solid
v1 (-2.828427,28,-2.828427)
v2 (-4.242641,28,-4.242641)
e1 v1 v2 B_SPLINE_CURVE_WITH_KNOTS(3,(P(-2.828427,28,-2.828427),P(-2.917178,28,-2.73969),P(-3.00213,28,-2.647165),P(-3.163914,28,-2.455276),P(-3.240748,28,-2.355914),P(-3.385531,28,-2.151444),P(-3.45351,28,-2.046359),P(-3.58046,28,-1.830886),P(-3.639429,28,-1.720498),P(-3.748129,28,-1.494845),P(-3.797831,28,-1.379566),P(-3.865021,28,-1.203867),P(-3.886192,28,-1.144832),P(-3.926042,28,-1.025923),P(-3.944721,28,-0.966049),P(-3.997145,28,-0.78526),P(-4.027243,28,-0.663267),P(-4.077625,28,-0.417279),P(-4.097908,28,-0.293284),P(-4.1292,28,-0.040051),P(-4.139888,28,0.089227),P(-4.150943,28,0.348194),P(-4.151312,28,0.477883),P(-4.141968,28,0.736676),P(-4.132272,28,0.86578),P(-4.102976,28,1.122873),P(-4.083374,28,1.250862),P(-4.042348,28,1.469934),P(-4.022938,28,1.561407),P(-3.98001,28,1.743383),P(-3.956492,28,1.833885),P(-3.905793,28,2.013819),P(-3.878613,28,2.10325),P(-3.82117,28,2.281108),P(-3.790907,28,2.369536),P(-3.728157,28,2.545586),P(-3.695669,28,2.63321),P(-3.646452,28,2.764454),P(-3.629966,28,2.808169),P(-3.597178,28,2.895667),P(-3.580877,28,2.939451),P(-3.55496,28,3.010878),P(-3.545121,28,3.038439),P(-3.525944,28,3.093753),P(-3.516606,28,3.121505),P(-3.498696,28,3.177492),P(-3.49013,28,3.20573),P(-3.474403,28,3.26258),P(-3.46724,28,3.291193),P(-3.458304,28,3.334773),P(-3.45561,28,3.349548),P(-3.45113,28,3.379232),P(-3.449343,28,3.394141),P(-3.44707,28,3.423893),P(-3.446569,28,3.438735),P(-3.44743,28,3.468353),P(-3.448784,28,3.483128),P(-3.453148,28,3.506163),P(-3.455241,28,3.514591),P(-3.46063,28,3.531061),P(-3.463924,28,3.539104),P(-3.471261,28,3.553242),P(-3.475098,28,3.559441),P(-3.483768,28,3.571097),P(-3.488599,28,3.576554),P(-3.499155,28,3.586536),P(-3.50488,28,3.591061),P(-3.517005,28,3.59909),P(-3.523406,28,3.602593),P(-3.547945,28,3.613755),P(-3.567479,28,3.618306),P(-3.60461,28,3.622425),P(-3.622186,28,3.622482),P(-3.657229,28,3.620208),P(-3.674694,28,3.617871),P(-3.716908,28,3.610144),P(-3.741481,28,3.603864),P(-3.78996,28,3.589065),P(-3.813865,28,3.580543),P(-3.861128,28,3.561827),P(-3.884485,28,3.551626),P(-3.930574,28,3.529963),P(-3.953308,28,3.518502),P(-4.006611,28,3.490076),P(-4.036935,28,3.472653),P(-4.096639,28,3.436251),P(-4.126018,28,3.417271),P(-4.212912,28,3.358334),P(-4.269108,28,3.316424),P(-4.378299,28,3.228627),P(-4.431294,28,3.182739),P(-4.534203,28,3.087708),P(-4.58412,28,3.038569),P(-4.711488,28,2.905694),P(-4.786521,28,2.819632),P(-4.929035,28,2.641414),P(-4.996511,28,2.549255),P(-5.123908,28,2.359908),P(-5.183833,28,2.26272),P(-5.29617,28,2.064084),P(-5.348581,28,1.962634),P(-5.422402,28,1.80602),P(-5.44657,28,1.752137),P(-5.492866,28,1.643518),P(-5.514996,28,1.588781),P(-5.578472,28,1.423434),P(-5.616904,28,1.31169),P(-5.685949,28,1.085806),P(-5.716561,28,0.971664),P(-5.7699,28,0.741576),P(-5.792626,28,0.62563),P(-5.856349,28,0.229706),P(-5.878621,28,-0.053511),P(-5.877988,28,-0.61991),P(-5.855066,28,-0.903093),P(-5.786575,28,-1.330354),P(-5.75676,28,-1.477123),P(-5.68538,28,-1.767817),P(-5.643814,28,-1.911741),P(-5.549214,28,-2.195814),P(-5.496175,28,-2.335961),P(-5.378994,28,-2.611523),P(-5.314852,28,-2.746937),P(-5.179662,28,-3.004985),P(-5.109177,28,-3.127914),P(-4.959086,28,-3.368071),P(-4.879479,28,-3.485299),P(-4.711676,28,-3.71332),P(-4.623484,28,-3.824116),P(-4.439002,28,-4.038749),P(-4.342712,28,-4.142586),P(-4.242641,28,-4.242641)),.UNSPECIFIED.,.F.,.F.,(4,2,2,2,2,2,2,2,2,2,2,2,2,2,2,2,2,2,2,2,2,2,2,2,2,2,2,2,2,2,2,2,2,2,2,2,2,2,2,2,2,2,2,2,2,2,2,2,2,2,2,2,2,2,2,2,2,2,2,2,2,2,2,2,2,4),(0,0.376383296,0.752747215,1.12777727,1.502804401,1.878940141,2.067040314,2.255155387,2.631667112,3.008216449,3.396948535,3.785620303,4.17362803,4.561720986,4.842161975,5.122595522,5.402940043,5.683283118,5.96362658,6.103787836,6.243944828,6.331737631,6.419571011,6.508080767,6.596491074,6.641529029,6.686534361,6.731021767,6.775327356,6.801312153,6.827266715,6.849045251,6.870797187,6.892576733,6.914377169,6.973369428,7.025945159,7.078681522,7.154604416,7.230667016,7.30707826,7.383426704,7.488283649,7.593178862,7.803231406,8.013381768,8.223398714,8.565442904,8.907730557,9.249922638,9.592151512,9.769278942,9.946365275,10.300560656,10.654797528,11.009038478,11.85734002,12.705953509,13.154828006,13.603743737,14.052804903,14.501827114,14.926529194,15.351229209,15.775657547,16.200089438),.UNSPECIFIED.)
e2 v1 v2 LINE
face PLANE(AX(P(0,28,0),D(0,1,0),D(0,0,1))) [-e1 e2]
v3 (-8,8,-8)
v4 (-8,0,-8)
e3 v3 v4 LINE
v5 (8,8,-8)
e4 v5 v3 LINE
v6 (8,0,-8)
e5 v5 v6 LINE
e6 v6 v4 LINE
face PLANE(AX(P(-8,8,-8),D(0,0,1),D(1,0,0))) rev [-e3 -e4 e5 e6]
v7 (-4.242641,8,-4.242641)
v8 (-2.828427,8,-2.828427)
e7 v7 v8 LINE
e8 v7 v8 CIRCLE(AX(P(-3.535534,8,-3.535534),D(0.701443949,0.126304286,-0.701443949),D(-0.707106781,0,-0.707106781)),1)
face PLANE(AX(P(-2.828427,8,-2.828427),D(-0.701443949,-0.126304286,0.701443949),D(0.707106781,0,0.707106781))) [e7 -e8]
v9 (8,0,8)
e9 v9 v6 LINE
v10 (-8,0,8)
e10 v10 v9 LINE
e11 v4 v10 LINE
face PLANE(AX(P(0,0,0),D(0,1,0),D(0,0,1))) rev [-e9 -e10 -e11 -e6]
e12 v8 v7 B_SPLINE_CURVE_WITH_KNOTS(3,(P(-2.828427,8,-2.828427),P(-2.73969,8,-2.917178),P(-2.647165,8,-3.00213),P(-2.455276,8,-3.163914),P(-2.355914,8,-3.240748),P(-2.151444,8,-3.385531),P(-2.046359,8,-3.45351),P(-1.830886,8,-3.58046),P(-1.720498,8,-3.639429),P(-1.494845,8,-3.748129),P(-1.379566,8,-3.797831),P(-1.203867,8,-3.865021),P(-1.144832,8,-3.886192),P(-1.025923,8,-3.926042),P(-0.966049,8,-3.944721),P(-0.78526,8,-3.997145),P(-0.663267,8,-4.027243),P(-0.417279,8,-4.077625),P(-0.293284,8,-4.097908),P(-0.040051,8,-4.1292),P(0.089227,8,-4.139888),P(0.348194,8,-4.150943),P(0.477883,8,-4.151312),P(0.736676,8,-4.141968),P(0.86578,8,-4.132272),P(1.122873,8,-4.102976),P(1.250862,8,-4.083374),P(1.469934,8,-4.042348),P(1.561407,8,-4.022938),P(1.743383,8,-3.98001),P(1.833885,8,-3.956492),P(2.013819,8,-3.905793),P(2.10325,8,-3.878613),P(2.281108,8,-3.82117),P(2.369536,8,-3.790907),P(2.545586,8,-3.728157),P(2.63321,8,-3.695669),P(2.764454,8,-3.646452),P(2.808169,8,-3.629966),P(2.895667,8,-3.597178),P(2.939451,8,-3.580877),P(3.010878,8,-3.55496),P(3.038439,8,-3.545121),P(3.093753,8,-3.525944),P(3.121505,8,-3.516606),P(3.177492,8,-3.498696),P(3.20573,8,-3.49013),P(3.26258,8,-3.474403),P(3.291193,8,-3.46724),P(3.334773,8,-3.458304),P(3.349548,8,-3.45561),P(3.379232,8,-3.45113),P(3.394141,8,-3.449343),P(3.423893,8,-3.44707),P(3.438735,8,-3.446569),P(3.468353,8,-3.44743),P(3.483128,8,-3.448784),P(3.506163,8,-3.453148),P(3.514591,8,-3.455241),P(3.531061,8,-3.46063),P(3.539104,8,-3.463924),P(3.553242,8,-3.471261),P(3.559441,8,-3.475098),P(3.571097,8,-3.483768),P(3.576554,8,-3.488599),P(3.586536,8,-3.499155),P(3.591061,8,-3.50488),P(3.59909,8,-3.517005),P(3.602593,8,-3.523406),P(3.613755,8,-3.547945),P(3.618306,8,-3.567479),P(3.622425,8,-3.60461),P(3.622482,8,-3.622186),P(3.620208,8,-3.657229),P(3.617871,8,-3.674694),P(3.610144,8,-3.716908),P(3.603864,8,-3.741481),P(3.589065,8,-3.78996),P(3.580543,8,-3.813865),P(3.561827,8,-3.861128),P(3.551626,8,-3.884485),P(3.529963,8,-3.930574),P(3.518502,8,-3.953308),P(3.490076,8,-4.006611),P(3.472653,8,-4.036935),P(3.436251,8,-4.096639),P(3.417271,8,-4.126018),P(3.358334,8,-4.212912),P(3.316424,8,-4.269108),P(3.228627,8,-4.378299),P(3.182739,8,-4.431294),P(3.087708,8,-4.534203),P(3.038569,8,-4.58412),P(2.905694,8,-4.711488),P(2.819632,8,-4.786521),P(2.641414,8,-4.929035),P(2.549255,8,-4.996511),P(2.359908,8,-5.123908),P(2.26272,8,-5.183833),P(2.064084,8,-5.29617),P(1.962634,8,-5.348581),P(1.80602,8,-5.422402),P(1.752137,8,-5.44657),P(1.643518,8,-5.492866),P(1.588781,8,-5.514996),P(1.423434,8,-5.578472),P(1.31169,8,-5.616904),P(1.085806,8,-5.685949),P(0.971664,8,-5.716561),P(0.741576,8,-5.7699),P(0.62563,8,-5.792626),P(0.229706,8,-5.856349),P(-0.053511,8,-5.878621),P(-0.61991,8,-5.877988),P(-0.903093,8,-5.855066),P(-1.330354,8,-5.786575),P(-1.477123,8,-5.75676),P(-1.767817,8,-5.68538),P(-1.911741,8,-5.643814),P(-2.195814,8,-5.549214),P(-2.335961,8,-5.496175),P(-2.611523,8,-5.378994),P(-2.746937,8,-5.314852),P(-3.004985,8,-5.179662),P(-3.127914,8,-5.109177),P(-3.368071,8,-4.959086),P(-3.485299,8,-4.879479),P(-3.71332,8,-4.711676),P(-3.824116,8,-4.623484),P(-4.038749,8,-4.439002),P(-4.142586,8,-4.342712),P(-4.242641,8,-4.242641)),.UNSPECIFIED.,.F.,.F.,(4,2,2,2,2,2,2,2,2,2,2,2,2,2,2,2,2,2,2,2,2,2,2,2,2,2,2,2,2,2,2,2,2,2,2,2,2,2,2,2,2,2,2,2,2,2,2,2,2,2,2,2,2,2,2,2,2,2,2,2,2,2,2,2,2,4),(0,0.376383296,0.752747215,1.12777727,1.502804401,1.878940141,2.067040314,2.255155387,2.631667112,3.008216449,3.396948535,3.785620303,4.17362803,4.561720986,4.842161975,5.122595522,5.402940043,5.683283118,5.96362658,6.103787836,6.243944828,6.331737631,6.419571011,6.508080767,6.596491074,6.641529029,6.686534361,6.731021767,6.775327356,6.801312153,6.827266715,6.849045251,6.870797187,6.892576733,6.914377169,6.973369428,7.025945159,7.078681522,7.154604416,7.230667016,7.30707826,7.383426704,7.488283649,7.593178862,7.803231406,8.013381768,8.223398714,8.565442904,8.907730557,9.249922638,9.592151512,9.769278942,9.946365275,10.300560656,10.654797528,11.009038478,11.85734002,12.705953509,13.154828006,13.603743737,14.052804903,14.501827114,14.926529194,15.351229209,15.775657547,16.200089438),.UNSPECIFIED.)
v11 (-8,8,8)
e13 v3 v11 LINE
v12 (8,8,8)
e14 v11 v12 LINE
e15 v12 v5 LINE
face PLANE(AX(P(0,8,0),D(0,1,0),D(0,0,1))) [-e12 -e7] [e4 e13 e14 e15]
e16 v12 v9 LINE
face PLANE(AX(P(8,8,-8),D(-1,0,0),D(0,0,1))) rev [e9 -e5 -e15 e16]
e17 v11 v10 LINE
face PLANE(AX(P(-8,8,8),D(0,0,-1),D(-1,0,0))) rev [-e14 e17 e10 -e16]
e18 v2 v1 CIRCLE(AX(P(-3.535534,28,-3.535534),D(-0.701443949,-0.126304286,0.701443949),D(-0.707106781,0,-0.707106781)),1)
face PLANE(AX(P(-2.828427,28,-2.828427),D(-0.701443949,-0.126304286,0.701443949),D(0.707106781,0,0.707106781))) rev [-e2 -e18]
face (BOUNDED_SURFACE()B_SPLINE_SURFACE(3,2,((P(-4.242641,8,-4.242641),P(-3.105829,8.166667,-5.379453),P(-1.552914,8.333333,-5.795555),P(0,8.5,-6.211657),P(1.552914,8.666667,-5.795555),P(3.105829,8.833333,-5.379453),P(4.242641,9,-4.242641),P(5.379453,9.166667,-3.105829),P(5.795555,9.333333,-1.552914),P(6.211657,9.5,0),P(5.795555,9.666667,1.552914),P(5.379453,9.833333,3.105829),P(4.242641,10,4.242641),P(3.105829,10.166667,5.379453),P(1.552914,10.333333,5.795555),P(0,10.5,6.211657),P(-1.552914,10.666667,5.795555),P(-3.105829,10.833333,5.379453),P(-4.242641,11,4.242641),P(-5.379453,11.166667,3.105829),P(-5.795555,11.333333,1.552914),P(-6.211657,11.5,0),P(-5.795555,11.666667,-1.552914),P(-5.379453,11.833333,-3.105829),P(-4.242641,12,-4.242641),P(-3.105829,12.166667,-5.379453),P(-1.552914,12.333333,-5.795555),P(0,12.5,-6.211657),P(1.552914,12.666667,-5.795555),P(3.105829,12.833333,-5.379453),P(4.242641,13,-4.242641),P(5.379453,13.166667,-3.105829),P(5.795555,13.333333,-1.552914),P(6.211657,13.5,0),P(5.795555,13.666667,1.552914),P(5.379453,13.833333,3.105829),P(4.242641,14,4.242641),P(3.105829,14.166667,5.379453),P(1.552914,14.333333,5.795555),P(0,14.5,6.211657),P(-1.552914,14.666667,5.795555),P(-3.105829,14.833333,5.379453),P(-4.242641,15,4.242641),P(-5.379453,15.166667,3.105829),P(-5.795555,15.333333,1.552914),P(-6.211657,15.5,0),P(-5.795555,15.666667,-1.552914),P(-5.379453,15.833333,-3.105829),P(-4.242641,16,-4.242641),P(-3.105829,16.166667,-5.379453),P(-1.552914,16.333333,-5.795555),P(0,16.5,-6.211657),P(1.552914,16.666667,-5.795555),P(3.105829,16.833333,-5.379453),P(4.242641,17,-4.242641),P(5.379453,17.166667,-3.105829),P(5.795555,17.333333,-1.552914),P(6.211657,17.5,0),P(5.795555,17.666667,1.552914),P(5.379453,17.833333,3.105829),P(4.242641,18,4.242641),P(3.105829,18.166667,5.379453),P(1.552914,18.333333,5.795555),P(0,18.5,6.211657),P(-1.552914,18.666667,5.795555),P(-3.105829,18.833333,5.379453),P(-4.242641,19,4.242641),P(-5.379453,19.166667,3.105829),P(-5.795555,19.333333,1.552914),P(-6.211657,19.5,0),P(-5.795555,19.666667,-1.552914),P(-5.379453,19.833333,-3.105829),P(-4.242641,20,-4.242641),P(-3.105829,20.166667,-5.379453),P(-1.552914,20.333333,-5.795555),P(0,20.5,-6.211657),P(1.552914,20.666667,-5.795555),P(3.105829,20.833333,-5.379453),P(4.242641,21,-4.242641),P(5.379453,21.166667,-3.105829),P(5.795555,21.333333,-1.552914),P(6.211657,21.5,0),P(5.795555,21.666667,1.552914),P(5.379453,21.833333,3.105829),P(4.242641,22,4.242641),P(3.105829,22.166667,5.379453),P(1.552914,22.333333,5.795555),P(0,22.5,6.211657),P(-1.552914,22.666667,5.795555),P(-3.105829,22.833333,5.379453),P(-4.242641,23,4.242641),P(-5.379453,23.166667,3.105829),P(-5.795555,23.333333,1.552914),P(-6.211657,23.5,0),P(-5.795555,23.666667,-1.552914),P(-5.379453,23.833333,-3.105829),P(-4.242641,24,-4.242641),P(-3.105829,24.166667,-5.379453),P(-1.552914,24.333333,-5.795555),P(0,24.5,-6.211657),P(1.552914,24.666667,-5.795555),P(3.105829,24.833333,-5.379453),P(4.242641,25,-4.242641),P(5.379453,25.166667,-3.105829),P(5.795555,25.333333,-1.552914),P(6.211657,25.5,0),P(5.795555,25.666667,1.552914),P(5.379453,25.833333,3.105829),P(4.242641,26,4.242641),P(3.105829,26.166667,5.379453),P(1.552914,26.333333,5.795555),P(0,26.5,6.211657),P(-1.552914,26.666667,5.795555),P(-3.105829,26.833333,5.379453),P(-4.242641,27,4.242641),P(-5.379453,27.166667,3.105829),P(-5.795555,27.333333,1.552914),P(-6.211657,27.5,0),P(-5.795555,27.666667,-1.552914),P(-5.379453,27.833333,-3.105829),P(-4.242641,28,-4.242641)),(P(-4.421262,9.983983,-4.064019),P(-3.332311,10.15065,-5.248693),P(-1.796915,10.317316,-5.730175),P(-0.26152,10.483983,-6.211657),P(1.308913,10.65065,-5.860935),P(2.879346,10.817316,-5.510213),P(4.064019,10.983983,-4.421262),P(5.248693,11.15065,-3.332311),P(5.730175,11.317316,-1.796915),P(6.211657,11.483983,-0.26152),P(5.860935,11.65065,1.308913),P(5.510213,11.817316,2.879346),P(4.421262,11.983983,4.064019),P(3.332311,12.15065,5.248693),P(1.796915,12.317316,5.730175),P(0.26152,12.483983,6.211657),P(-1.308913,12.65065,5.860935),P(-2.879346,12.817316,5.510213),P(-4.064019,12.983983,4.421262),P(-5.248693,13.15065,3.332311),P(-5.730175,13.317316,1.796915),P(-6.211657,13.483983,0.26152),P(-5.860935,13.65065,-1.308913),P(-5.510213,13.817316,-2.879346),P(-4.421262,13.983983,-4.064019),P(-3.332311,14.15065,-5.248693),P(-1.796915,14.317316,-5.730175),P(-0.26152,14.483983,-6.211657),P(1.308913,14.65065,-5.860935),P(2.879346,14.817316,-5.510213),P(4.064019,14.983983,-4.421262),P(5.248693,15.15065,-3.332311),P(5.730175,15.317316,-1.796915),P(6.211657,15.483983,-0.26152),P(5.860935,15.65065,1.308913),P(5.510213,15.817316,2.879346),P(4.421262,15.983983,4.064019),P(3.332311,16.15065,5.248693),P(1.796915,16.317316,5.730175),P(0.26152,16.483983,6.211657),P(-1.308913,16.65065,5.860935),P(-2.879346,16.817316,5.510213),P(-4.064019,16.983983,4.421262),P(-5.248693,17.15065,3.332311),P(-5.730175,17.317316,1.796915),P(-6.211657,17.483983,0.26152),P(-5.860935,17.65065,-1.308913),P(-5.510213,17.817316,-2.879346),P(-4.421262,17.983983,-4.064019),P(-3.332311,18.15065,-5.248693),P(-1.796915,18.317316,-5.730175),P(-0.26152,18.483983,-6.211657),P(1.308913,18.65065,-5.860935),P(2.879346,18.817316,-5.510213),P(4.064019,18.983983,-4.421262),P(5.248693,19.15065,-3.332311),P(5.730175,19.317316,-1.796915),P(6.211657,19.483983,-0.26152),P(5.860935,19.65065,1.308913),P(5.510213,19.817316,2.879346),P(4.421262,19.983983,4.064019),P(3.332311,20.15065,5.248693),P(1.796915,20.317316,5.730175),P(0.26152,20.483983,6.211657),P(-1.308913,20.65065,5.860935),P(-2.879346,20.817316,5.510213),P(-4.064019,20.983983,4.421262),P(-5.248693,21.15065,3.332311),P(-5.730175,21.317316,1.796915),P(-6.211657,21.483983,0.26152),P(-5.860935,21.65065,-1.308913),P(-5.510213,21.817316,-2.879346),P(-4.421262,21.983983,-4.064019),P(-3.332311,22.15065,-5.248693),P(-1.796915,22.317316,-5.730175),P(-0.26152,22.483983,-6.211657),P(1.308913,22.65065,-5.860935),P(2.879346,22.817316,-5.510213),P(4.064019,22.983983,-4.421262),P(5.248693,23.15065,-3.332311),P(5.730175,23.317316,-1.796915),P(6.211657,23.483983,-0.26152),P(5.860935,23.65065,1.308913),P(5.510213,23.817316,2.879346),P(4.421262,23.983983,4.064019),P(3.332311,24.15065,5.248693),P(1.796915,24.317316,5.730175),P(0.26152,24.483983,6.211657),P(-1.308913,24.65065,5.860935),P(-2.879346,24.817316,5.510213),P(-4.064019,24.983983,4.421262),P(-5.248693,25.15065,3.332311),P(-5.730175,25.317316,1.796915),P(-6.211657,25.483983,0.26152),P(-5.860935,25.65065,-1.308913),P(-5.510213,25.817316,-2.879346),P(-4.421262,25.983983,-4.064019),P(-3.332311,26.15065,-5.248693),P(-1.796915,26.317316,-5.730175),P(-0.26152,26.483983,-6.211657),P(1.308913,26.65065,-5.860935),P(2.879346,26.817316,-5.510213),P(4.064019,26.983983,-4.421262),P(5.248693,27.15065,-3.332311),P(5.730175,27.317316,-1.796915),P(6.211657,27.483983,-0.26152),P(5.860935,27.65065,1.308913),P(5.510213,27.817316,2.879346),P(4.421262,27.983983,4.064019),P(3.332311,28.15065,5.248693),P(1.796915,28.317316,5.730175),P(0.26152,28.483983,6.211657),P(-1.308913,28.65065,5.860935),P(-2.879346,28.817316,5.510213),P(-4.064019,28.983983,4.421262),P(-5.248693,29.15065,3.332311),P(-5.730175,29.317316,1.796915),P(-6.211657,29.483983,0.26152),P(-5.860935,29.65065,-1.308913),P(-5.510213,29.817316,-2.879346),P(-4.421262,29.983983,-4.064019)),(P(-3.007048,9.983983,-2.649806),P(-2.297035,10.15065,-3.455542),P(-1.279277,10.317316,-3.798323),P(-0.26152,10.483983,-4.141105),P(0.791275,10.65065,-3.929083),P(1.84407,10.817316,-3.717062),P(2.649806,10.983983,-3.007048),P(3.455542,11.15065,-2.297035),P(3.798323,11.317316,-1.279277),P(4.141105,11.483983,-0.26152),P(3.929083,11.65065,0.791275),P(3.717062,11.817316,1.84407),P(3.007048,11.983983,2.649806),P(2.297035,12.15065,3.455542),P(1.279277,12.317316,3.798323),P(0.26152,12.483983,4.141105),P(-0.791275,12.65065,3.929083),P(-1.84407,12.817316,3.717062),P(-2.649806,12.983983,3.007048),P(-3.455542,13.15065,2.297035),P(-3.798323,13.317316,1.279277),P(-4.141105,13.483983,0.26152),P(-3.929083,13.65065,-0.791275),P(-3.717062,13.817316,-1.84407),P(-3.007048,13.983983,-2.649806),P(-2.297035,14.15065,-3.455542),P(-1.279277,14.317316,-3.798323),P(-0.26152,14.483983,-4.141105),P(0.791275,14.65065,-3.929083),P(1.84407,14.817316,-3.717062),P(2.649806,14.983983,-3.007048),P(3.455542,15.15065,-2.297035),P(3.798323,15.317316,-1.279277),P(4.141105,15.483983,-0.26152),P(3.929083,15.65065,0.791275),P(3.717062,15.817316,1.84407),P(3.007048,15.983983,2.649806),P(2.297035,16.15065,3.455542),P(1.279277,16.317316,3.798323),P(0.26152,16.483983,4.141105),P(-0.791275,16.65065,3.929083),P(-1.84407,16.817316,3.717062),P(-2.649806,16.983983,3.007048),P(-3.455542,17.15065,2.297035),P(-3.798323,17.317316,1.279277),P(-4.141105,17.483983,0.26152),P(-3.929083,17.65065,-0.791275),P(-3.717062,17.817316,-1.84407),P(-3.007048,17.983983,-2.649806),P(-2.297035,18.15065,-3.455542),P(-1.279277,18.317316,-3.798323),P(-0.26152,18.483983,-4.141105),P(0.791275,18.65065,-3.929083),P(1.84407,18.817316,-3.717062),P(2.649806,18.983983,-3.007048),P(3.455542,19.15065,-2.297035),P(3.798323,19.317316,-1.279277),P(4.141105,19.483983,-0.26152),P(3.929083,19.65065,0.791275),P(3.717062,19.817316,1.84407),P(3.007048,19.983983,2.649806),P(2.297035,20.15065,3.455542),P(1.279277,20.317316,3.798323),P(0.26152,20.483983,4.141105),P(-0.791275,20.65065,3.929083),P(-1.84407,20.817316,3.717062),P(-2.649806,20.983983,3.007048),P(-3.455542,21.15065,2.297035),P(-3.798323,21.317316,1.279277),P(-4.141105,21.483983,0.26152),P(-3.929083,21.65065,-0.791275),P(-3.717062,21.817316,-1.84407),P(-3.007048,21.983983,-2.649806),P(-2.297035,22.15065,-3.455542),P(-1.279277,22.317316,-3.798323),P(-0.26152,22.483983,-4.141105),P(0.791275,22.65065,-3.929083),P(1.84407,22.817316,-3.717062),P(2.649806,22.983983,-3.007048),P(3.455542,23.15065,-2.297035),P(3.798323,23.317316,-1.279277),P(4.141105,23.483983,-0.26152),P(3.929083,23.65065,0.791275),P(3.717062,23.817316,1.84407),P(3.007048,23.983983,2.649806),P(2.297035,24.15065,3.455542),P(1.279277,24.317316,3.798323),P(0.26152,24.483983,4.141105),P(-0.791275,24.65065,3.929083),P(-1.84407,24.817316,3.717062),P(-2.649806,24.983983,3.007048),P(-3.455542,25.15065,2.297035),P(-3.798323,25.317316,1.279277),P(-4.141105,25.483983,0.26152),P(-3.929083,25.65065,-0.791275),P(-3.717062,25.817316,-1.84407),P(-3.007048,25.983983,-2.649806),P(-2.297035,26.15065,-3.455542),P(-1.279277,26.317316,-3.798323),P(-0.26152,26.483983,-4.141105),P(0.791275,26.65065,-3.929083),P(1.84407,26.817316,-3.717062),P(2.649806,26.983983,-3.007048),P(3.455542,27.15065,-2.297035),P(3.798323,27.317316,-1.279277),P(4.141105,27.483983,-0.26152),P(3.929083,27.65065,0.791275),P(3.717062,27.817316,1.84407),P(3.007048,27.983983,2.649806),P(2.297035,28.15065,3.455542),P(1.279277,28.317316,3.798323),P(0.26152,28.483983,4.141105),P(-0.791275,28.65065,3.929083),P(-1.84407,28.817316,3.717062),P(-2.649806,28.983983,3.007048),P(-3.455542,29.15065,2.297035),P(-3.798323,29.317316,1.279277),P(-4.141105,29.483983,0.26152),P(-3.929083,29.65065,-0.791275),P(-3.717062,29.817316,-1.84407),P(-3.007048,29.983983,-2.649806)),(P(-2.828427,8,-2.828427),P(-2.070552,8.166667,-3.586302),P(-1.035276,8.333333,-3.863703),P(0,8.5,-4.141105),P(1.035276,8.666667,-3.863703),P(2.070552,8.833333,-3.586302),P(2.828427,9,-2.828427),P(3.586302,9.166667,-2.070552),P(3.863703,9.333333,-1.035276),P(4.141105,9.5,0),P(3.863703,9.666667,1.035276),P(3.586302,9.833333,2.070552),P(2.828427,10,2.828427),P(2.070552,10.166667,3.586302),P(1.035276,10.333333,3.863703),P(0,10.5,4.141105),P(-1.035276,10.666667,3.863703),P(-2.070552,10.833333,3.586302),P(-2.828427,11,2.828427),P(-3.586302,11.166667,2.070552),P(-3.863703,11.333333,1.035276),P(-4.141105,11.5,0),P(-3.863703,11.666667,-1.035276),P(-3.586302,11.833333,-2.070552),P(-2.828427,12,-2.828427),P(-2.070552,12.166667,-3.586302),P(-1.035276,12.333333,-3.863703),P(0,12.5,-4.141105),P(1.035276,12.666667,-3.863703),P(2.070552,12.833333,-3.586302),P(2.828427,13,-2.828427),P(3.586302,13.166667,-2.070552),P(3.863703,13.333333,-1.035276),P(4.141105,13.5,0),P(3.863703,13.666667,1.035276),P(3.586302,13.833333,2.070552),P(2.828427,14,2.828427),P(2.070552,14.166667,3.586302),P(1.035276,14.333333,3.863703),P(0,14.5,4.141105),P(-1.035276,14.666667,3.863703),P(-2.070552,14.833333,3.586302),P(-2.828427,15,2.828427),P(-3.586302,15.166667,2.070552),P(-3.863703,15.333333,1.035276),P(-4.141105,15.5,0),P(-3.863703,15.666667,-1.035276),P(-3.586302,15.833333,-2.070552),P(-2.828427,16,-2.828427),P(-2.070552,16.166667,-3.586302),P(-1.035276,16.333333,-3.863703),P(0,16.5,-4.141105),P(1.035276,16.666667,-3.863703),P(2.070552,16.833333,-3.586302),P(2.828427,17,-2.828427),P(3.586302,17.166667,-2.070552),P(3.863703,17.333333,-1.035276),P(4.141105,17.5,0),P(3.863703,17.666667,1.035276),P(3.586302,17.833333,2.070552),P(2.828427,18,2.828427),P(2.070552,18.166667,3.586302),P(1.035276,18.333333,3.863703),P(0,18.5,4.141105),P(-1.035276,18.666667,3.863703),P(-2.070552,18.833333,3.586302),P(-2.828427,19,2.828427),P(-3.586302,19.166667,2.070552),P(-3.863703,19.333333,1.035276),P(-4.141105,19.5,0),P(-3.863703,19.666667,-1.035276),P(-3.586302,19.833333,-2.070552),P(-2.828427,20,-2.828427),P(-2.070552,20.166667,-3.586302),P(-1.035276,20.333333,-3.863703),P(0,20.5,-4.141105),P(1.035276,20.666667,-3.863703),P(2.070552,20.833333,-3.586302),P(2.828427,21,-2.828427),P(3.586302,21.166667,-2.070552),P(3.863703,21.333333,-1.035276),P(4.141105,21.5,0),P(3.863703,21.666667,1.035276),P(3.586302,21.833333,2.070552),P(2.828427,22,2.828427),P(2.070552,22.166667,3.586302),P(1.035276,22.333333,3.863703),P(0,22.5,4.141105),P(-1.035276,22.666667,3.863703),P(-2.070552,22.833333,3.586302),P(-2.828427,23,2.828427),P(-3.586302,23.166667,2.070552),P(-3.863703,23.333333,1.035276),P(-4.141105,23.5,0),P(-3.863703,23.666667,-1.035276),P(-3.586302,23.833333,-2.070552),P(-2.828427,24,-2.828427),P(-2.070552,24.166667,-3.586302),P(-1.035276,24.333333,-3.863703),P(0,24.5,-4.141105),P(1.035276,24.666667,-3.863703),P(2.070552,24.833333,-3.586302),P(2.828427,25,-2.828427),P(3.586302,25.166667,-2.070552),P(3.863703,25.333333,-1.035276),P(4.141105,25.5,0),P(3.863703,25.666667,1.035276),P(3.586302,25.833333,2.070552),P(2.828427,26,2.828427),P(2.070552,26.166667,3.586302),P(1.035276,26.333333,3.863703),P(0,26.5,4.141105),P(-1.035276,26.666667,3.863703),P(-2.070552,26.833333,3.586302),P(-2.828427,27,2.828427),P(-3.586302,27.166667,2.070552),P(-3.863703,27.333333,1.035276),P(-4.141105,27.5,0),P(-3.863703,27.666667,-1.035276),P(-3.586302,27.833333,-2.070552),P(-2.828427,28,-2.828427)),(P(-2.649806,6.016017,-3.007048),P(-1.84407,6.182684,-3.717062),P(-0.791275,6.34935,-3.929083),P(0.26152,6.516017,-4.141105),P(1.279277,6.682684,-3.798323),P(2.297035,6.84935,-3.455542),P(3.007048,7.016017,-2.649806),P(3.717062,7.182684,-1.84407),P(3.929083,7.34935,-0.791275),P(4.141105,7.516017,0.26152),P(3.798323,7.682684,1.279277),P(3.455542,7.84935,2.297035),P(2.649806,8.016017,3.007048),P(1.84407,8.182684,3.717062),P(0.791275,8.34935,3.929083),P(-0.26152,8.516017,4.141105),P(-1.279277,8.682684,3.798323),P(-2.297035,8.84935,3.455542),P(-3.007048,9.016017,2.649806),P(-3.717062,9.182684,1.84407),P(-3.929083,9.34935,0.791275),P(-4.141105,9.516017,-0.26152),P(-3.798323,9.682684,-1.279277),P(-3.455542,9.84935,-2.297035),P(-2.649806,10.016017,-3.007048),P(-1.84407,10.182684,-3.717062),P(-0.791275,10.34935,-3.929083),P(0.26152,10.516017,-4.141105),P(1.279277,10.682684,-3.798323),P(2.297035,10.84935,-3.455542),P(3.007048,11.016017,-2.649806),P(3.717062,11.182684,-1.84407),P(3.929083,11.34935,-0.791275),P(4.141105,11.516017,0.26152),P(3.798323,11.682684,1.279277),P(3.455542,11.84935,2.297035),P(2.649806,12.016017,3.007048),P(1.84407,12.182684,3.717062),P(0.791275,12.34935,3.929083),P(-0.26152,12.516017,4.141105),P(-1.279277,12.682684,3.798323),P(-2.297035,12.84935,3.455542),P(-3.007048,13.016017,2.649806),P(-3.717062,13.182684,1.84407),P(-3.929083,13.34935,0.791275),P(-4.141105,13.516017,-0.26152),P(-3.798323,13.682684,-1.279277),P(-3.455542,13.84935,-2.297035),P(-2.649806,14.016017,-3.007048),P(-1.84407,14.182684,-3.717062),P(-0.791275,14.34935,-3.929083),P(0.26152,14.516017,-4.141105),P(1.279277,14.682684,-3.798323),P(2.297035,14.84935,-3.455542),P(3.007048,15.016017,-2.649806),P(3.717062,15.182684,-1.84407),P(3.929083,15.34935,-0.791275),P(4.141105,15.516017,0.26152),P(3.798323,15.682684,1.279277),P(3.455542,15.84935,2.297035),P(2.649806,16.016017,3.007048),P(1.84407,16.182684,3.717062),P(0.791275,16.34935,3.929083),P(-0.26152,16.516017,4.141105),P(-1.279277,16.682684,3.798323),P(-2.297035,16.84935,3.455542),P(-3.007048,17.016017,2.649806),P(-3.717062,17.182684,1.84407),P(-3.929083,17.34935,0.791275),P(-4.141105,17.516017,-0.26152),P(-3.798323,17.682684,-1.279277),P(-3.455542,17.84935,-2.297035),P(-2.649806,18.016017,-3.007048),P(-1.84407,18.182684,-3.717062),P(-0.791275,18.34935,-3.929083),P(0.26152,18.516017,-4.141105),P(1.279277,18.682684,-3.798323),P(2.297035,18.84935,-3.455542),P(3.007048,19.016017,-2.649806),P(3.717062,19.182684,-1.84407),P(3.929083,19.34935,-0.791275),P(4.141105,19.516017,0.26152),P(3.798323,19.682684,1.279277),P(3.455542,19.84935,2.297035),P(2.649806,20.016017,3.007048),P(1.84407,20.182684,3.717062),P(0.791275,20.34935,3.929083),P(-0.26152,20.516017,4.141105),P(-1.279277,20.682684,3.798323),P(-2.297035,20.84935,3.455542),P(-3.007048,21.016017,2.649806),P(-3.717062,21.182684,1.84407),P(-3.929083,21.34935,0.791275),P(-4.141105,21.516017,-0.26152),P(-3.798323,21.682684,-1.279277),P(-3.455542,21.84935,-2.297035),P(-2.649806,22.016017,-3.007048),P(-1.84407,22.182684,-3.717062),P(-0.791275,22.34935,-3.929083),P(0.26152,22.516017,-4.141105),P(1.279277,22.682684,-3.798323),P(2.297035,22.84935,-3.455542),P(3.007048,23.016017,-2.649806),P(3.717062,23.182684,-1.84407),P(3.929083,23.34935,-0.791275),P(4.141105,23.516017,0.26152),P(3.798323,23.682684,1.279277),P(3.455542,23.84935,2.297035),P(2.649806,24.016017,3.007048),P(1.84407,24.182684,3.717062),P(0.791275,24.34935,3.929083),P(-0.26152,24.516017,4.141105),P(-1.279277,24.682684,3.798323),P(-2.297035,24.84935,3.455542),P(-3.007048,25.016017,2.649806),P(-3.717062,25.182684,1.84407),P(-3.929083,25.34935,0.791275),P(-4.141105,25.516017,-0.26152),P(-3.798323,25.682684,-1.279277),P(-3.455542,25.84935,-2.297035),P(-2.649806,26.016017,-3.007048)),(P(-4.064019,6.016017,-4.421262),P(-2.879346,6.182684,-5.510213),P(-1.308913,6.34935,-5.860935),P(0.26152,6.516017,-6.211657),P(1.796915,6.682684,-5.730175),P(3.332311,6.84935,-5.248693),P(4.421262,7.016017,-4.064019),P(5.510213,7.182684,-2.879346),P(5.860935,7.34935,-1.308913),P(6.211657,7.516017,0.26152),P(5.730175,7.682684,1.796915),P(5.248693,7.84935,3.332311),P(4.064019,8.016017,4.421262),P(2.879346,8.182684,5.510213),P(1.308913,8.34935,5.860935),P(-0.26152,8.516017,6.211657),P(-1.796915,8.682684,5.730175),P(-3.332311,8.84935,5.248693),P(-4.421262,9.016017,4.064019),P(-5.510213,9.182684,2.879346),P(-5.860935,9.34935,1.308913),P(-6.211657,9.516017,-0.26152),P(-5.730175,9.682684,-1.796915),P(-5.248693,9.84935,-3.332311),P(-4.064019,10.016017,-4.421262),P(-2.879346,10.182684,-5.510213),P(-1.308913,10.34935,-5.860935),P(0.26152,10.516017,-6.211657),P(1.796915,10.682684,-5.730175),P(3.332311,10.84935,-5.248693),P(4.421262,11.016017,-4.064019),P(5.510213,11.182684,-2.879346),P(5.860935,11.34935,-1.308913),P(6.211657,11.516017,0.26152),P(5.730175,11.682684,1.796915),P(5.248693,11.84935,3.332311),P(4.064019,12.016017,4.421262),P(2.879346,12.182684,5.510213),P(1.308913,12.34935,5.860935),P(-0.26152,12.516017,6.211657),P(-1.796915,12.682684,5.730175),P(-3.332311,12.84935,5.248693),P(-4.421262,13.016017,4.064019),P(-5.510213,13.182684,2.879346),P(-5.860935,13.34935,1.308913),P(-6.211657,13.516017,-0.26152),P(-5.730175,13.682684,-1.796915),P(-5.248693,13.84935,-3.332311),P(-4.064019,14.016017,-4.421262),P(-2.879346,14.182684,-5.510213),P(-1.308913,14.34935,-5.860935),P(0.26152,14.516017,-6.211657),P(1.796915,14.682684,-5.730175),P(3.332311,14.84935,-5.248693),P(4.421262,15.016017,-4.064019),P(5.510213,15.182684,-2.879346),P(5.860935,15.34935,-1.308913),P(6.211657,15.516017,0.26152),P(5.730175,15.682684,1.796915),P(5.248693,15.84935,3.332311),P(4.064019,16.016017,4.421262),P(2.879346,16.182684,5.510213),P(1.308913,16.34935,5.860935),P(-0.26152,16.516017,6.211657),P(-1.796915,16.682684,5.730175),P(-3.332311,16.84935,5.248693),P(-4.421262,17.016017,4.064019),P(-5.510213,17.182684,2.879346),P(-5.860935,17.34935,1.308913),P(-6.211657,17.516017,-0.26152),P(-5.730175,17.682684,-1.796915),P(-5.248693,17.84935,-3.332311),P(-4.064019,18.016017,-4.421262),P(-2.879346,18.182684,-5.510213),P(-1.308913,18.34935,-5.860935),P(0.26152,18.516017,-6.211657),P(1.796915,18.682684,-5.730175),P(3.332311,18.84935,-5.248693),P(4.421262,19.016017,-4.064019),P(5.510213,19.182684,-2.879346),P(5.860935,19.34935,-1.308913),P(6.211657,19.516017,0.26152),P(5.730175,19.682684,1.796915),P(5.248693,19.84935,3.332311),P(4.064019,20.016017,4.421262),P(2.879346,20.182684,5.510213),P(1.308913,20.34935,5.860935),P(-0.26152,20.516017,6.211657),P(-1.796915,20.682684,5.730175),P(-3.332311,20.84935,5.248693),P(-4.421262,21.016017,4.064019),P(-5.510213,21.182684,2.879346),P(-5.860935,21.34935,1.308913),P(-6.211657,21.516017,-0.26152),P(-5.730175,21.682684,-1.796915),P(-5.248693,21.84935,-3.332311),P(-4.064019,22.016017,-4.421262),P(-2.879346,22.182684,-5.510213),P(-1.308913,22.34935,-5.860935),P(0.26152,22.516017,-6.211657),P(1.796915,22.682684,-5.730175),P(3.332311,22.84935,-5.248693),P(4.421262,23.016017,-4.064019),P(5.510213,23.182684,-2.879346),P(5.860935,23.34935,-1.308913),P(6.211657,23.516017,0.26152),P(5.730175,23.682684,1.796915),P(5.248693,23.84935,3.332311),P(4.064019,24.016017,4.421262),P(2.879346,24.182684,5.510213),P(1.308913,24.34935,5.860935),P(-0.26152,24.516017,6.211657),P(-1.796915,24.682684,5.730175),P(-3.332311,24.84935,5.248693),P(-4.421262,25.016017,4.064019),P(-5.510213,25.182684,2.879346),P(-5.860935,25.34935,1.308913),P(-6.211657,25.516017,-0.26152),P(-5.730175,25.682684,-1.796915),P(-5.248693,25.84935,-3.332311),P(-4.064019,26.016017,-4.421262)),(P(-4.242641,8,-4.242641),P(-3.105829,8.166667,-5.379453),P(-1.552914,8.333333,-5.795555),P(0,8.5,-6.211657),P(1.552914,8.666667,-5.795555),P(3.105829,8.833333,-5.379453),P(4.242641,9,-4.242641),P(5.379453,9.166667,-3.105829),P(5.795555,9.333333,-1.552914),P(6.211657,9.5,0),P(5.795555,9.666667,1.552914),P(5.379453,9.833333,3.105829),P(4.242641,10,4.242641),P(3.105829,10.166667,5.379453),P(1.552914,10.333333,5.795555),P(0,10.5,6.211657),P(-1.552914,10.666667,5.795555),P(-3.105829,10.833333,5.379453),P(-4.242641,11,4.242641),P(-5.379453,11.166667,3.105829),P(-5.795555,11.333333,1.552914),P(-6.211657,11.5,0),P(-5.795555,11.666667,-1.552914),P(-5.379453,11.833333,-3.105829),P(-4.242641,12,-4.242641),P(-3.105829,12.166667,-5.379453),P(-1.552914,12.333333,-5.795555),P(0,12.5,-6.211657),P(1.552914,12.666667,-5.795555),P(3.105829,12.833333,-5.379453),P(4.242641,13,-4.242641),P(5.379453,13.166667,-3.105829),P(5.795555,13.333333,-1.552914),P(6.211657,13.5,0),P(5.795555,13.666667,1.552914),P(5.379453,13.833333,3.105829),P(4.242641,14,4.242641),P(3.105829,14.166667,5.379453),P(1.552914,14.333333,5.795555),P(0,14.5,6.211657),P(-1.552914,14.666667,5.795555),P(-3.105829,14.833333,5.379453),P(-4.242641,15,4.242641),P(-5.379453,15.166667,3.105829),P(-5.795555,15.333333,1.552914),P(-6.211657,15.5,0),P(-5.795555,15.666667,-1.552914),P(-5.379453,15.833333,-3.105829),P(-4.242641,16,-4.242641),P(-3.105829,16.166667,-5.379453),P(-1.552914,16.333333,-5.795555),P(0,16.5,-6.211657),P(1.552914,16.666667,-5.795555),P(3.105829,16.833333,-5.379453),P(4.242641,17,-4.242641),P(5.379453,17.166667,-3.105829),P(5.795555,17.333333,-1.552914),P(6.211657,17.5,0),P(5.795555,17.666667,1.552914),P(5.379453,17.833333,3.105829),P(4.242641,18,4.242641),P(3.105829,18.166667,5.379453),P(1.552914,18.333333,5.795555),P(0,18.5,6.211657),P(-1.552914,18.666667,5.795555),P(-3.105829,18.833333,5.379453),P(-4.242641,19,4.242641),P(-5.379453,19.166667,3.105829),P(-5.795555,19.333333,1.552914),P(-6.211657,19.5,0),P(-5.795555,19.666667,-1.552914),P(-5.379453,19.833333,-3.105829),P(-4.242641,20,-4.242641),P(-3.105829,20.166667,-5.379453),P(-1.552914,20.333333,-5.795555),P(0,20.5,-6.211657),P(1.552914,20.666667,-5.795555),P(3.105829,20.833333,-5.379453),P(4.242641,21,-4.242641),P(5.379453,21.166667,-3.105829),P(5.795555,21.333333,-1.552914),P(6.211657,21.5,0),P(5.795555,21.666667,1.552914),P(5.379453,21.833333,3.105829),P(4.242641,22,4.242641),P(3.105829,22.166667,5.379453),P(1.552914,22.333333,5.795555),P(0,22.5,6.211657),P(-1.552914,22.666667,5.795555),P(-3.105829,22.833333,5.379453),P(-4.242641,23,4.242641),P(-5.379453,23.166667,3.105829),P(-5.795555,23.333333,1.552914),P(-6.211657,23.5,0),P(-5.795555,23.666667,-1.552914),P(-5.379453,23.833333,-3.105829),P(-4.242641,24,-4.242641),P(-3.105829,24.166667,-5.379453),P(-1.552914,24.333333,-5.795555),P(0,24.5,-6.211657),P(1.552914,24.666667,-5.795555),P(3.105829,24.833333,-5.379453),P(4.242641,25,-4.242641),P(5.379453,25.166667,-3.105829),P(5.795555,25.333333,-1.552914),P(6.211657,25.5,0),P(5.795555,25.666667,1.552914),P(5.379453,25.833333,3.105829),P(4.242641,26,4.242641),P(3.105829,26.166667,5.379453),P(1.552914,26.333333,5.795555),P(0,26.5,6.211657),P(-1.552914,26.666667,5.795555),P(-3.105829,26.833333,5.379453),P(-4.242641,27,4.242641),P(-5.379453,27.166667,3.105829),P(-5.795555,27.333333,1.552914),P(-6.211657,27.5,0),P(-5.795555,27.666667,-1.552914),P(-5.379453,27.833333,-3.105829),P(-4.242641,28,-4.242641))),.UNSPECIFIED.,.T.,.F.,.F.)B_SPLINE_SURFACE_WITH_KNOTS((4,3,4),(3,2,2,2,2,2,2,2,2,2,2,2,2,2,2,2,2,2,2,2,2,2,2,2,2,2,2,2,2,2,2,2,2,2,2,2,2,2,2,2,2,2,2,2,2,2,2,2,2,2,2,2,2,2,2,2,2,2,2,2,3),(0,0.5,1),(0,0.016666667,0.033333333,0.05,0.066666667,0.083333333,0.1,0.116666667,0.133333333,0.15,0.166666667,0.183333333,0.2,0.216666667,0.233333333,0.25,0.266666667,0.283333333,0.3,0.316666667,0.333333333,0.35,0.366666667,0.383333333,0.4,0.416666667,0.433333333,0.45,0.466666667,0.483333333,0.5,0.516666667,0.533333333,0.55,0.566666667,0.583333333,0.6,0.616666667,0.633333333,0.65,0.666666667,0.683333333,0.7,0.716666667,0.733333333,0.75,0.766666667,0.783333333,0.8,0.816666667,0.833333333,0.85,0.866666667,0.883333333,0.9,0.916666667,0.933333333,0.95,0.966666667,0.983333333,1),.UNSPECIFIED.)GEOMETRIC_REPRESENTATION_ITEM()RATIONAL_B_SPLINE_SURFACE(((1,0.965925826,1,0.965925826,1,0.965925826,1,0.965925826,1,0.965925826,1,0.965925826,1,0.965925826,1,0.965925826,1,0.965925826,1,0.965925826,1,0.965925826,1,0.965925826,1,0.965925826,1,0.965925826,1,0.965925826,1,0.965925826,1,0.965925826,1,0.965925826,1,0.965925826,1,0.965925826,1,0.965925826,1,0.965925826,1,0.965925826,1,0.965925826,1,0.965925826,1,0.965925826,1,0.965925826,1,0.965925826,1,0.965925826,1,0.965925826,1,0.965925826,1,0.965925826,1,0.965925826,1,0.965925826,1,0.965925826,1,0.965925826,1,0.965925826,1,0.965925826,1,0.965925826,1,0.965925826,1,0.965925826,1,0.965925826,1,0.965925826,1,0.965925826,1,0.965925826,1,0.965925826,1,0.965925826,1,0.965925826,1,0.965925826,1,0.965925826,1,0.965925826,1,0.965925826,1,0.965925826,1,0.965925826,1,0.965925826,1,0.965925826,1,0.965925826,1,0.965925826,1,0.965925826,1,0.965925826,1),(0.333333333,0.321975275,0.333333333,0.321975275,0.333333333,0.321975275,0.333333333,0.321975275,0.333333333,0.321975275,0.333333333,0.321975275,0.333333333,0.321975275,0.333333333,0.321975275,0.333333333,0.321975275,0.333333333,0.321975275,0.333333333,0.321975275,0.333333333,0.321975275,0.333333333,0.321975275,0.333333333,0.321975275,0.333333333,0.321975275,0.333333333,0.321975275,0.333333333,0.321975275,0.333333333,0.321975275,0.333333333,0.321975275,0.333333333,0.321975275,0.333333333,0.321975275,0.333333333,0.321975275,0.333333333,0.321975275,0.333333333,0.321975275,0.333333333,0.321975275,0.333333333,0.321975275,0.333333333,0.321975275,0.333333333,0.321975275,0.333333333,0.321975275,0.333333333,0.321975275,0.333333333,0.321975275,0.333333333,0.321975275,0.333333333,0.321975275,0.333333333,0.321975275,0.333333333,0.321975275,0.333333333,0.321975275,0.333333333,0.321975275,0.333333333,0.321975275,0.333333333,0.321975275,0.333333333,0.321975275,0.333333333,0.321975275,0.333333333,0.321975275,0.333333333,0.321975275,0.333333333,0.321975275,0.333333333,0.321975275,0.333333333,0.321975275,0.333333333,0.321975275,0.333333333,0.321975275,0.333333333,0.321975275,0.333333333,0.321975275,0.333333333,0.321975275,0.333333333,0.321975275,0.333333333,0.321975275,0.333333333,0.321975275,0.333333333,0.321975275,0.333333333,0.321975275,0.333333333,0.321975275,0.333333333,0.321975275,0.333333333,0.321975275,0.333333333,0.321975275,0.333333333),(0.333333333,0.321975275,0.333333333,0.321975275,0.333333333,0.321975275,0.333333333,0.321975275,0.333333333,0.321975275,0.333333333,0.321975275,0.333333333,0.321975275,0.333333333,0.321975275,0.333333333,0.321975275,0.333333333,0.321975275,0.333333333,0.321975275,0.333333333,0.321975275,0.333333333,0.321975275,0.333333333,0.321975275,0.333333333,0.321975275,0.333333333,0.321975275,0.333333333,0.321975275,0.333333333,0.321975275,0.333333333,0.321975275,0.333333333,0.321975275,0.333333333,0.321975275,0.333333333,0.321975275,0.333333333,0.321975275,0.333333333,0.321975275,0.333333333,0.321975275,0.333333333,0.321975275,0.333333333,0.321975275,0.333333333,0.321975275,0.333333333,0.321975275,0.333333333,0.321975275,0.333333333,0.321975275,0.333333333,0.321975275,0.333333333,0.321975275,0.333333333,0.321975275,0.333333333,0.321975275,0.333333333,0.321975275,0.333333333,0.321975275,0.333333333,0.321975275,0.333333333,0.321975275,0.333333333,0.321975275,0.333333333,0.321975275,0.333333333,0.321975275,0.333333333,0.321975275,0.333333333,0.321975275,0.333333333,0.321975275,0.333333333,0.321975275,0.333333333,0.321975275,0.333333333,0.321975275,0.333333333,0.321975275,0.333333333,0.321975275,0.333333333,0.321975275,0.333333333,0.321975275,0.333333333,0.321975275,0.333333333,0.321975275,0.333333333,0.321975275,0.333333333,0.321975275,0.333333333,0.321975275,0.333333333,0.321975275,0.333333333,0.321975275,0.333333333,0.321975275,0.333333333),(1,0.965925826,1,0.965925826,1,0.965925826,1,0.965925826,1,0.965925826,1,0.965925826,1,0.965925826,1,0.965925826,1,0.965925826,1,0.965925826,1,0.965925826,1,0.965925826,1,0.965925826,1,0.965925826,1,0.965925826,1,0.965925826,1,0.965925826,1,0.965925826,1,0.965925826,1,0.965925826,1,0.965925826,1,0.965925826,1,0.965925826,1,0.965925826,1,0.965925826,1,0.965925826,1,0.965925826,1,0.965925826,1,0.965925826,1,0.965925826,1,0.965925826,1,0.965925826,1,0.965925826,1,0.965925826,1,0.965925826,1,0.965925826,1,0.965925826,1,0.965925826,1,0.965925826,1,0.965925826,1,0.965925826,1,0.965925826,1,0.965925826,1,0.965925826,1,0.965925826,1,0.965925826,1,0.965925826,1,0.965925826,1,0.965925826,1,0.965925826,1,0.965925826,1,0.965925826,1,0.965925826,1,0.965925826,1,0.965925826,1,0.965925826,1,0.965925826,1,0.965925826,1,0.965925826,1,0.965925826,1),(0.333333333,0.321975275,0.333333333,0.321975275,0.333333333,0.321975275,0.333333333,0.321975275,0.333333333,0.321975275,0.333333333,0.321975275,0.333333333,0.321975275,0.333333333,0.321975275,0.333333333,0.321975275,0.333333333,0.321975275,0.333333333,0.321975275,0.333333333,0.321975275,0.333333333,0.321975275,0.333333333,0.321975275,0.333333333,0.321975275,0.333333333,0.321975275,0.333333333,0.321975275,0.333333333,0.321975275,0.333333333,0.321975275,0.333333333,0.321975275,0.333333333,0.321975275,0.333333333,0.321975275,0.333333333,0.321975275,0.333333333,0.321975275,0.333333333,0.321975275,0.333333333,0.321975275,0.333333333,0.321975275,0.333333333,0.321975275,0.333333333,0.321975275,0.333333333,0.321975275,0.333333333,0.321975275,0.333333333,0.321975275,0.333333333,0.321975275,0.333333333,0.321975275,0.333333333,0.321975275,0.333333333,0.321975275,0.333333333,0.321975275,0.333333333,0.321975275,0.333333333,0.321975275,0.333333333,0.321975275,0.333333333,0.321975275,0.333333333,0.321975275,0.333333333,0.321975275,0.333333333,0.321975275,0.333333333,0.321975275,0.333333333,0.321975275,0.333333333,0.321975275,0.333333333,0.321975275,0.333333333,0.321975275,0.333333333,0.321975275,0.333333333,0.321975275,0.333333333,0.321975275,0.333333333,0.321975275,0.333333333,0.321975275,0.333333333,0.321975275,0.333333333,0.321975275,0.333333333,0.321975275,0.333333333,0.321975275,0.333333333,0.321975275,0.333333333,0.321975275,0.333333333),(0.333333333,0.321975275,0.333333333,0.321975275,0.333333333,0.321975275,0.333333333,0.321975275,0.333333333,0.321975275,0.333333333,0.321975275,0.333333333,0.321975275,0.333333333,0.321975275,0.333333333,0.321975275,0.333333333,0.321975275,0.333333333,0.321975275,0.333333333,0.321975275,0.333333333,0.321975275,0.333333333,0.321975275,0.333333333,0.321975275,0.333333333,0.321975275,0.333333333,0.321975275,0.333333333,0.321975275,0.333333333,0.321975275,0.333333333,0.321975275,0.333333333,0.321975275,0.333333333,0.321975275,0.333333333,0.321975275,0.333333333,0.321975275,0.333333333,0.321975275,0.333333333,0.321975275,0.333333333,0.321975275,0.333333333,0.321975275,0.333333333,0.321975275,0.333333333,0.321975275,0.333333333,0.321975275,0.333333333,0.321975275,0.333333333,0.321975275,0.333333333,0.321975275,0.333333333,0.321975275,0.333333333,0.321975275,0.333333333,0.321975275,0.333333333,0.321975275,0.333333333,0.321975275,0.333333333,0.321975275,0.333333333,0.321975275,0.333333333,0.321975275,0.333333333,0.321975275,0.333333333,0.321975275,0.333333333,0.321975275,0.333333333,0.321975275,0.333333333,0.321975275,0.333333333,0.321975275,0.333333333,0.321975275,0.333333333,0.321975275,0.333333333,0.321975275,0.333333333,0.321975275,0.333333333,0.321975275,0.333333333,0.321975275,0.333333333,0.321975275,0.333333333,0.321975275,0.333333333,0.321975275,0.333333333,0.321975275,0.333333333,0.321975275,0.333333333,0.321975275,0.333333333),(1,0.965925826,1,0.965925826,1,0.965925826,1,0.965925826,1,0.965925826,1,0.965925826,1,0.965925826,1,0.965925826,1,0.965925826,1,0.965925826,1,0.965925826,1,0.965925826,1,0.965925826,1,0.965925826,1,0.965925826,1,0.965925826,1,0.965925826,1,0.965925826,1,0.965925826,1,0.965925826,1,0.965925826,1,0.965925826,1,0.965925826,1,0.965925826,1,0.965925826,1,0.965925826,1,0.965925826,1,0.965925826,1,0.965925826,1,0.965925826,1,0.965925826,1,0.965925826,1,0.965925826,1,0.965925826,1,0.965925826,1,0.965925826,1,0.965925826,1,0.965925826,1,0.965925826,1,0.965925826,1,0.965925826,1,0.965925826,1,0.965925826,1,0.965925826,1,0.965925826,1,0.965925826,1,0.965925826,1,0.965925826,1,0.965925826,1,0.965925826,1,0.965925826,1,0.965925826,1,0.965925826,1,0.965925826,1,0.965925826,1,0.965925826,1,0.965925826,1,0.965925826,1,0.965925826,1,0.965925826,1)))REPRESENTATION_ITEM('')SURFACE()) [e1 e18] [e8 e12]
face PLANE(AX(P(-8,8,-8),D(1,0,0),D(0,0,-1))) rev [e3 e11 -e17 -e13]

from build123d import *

# Parameters (mm, degrees)
SKETCH_1_W              = 16
SKETCH_1_H              = 16
EXTRUDE_1_DEPTH         = 8
SWEEP_1_PITCH           = 4
SWEEP_1_HEIGHT          = 20
SWEEP_1_RADIUS          = 5
SWEEP_1_START_ANGLE     = -135
SWEEP_1_PROFILE_R       = 1
CUT_EXTRUDE_START       = 28
CUT_EXTRUDE_1_OUTLINE_W = 6
CUT_EXTRUDE_1_OUTLINE_H = 11
CUT_EXTRUDE_1_DEPTH     = 0.991991546


with BuildPart() as part:
    # 草图1 → 凸台-拉伸1 (new body)
    with BuildSketch(Plane(origin=(0, 0, 0), x_dir=(1, 0, 0), z_dir=(0, 1, 0))):
        Rectangle(SKETCH_1_W, SKETCH_1_H)
    extrude(amount=EXTRUDE_1_DEPTH)

    # 扫描1: sweep along a helix
    with BuildLine() as sweep_1_path:
        add(Helix(SWEEP_1_PITCH, SWEEP_1_HEIGHT, SWEEP_1_RADIUS, center=(0, 8, 0), direction=(0, 1, 0), lefthand=True, mode=Mode.PRIVATE).rotate(Axis((0, 8, 0), (0, 1, 0)), SWEEP_1_START_ANGLE))
    # 扫描1 profile (on start of the path) → 扫描1 (sweep)
    with BuildSketch(Plane(origin=(-3.535533906, 8, -3.535533906), x_dir=(0.7071067811864822, 0, 0.7071067811866131), z_dir=(0.7014439490182723, 0.12630428643353764, -0.7014439490181424))):
        Circle(SWEEP_1_PROFILE_R)
    sweep(path=sweep_1_path.line, is_frenet=True)

    # 切除-拉伸1: read off the stored shape, not the designer's step
    # 切除-拉伸1 outline → 切除-拉伸1 (cut)
    with BuildSketch(Plane(origin=(0, 0, 0), x_dir=(1, 0, 0), z_dir=(0, 1, 0)).offset(CUT_EXTRUDE_START)):
        with Locations((-4, 0.5)):
            Rectangle(CUT_EXTRUDE_1_OUTLINE_W, CUT_EXTRUDE_1_OUTLINE_H)
    extrude(amount=CUT_EXTRUDE_1_DEPTH, mode=Mode.SUBTRACT)


solid = part.part
